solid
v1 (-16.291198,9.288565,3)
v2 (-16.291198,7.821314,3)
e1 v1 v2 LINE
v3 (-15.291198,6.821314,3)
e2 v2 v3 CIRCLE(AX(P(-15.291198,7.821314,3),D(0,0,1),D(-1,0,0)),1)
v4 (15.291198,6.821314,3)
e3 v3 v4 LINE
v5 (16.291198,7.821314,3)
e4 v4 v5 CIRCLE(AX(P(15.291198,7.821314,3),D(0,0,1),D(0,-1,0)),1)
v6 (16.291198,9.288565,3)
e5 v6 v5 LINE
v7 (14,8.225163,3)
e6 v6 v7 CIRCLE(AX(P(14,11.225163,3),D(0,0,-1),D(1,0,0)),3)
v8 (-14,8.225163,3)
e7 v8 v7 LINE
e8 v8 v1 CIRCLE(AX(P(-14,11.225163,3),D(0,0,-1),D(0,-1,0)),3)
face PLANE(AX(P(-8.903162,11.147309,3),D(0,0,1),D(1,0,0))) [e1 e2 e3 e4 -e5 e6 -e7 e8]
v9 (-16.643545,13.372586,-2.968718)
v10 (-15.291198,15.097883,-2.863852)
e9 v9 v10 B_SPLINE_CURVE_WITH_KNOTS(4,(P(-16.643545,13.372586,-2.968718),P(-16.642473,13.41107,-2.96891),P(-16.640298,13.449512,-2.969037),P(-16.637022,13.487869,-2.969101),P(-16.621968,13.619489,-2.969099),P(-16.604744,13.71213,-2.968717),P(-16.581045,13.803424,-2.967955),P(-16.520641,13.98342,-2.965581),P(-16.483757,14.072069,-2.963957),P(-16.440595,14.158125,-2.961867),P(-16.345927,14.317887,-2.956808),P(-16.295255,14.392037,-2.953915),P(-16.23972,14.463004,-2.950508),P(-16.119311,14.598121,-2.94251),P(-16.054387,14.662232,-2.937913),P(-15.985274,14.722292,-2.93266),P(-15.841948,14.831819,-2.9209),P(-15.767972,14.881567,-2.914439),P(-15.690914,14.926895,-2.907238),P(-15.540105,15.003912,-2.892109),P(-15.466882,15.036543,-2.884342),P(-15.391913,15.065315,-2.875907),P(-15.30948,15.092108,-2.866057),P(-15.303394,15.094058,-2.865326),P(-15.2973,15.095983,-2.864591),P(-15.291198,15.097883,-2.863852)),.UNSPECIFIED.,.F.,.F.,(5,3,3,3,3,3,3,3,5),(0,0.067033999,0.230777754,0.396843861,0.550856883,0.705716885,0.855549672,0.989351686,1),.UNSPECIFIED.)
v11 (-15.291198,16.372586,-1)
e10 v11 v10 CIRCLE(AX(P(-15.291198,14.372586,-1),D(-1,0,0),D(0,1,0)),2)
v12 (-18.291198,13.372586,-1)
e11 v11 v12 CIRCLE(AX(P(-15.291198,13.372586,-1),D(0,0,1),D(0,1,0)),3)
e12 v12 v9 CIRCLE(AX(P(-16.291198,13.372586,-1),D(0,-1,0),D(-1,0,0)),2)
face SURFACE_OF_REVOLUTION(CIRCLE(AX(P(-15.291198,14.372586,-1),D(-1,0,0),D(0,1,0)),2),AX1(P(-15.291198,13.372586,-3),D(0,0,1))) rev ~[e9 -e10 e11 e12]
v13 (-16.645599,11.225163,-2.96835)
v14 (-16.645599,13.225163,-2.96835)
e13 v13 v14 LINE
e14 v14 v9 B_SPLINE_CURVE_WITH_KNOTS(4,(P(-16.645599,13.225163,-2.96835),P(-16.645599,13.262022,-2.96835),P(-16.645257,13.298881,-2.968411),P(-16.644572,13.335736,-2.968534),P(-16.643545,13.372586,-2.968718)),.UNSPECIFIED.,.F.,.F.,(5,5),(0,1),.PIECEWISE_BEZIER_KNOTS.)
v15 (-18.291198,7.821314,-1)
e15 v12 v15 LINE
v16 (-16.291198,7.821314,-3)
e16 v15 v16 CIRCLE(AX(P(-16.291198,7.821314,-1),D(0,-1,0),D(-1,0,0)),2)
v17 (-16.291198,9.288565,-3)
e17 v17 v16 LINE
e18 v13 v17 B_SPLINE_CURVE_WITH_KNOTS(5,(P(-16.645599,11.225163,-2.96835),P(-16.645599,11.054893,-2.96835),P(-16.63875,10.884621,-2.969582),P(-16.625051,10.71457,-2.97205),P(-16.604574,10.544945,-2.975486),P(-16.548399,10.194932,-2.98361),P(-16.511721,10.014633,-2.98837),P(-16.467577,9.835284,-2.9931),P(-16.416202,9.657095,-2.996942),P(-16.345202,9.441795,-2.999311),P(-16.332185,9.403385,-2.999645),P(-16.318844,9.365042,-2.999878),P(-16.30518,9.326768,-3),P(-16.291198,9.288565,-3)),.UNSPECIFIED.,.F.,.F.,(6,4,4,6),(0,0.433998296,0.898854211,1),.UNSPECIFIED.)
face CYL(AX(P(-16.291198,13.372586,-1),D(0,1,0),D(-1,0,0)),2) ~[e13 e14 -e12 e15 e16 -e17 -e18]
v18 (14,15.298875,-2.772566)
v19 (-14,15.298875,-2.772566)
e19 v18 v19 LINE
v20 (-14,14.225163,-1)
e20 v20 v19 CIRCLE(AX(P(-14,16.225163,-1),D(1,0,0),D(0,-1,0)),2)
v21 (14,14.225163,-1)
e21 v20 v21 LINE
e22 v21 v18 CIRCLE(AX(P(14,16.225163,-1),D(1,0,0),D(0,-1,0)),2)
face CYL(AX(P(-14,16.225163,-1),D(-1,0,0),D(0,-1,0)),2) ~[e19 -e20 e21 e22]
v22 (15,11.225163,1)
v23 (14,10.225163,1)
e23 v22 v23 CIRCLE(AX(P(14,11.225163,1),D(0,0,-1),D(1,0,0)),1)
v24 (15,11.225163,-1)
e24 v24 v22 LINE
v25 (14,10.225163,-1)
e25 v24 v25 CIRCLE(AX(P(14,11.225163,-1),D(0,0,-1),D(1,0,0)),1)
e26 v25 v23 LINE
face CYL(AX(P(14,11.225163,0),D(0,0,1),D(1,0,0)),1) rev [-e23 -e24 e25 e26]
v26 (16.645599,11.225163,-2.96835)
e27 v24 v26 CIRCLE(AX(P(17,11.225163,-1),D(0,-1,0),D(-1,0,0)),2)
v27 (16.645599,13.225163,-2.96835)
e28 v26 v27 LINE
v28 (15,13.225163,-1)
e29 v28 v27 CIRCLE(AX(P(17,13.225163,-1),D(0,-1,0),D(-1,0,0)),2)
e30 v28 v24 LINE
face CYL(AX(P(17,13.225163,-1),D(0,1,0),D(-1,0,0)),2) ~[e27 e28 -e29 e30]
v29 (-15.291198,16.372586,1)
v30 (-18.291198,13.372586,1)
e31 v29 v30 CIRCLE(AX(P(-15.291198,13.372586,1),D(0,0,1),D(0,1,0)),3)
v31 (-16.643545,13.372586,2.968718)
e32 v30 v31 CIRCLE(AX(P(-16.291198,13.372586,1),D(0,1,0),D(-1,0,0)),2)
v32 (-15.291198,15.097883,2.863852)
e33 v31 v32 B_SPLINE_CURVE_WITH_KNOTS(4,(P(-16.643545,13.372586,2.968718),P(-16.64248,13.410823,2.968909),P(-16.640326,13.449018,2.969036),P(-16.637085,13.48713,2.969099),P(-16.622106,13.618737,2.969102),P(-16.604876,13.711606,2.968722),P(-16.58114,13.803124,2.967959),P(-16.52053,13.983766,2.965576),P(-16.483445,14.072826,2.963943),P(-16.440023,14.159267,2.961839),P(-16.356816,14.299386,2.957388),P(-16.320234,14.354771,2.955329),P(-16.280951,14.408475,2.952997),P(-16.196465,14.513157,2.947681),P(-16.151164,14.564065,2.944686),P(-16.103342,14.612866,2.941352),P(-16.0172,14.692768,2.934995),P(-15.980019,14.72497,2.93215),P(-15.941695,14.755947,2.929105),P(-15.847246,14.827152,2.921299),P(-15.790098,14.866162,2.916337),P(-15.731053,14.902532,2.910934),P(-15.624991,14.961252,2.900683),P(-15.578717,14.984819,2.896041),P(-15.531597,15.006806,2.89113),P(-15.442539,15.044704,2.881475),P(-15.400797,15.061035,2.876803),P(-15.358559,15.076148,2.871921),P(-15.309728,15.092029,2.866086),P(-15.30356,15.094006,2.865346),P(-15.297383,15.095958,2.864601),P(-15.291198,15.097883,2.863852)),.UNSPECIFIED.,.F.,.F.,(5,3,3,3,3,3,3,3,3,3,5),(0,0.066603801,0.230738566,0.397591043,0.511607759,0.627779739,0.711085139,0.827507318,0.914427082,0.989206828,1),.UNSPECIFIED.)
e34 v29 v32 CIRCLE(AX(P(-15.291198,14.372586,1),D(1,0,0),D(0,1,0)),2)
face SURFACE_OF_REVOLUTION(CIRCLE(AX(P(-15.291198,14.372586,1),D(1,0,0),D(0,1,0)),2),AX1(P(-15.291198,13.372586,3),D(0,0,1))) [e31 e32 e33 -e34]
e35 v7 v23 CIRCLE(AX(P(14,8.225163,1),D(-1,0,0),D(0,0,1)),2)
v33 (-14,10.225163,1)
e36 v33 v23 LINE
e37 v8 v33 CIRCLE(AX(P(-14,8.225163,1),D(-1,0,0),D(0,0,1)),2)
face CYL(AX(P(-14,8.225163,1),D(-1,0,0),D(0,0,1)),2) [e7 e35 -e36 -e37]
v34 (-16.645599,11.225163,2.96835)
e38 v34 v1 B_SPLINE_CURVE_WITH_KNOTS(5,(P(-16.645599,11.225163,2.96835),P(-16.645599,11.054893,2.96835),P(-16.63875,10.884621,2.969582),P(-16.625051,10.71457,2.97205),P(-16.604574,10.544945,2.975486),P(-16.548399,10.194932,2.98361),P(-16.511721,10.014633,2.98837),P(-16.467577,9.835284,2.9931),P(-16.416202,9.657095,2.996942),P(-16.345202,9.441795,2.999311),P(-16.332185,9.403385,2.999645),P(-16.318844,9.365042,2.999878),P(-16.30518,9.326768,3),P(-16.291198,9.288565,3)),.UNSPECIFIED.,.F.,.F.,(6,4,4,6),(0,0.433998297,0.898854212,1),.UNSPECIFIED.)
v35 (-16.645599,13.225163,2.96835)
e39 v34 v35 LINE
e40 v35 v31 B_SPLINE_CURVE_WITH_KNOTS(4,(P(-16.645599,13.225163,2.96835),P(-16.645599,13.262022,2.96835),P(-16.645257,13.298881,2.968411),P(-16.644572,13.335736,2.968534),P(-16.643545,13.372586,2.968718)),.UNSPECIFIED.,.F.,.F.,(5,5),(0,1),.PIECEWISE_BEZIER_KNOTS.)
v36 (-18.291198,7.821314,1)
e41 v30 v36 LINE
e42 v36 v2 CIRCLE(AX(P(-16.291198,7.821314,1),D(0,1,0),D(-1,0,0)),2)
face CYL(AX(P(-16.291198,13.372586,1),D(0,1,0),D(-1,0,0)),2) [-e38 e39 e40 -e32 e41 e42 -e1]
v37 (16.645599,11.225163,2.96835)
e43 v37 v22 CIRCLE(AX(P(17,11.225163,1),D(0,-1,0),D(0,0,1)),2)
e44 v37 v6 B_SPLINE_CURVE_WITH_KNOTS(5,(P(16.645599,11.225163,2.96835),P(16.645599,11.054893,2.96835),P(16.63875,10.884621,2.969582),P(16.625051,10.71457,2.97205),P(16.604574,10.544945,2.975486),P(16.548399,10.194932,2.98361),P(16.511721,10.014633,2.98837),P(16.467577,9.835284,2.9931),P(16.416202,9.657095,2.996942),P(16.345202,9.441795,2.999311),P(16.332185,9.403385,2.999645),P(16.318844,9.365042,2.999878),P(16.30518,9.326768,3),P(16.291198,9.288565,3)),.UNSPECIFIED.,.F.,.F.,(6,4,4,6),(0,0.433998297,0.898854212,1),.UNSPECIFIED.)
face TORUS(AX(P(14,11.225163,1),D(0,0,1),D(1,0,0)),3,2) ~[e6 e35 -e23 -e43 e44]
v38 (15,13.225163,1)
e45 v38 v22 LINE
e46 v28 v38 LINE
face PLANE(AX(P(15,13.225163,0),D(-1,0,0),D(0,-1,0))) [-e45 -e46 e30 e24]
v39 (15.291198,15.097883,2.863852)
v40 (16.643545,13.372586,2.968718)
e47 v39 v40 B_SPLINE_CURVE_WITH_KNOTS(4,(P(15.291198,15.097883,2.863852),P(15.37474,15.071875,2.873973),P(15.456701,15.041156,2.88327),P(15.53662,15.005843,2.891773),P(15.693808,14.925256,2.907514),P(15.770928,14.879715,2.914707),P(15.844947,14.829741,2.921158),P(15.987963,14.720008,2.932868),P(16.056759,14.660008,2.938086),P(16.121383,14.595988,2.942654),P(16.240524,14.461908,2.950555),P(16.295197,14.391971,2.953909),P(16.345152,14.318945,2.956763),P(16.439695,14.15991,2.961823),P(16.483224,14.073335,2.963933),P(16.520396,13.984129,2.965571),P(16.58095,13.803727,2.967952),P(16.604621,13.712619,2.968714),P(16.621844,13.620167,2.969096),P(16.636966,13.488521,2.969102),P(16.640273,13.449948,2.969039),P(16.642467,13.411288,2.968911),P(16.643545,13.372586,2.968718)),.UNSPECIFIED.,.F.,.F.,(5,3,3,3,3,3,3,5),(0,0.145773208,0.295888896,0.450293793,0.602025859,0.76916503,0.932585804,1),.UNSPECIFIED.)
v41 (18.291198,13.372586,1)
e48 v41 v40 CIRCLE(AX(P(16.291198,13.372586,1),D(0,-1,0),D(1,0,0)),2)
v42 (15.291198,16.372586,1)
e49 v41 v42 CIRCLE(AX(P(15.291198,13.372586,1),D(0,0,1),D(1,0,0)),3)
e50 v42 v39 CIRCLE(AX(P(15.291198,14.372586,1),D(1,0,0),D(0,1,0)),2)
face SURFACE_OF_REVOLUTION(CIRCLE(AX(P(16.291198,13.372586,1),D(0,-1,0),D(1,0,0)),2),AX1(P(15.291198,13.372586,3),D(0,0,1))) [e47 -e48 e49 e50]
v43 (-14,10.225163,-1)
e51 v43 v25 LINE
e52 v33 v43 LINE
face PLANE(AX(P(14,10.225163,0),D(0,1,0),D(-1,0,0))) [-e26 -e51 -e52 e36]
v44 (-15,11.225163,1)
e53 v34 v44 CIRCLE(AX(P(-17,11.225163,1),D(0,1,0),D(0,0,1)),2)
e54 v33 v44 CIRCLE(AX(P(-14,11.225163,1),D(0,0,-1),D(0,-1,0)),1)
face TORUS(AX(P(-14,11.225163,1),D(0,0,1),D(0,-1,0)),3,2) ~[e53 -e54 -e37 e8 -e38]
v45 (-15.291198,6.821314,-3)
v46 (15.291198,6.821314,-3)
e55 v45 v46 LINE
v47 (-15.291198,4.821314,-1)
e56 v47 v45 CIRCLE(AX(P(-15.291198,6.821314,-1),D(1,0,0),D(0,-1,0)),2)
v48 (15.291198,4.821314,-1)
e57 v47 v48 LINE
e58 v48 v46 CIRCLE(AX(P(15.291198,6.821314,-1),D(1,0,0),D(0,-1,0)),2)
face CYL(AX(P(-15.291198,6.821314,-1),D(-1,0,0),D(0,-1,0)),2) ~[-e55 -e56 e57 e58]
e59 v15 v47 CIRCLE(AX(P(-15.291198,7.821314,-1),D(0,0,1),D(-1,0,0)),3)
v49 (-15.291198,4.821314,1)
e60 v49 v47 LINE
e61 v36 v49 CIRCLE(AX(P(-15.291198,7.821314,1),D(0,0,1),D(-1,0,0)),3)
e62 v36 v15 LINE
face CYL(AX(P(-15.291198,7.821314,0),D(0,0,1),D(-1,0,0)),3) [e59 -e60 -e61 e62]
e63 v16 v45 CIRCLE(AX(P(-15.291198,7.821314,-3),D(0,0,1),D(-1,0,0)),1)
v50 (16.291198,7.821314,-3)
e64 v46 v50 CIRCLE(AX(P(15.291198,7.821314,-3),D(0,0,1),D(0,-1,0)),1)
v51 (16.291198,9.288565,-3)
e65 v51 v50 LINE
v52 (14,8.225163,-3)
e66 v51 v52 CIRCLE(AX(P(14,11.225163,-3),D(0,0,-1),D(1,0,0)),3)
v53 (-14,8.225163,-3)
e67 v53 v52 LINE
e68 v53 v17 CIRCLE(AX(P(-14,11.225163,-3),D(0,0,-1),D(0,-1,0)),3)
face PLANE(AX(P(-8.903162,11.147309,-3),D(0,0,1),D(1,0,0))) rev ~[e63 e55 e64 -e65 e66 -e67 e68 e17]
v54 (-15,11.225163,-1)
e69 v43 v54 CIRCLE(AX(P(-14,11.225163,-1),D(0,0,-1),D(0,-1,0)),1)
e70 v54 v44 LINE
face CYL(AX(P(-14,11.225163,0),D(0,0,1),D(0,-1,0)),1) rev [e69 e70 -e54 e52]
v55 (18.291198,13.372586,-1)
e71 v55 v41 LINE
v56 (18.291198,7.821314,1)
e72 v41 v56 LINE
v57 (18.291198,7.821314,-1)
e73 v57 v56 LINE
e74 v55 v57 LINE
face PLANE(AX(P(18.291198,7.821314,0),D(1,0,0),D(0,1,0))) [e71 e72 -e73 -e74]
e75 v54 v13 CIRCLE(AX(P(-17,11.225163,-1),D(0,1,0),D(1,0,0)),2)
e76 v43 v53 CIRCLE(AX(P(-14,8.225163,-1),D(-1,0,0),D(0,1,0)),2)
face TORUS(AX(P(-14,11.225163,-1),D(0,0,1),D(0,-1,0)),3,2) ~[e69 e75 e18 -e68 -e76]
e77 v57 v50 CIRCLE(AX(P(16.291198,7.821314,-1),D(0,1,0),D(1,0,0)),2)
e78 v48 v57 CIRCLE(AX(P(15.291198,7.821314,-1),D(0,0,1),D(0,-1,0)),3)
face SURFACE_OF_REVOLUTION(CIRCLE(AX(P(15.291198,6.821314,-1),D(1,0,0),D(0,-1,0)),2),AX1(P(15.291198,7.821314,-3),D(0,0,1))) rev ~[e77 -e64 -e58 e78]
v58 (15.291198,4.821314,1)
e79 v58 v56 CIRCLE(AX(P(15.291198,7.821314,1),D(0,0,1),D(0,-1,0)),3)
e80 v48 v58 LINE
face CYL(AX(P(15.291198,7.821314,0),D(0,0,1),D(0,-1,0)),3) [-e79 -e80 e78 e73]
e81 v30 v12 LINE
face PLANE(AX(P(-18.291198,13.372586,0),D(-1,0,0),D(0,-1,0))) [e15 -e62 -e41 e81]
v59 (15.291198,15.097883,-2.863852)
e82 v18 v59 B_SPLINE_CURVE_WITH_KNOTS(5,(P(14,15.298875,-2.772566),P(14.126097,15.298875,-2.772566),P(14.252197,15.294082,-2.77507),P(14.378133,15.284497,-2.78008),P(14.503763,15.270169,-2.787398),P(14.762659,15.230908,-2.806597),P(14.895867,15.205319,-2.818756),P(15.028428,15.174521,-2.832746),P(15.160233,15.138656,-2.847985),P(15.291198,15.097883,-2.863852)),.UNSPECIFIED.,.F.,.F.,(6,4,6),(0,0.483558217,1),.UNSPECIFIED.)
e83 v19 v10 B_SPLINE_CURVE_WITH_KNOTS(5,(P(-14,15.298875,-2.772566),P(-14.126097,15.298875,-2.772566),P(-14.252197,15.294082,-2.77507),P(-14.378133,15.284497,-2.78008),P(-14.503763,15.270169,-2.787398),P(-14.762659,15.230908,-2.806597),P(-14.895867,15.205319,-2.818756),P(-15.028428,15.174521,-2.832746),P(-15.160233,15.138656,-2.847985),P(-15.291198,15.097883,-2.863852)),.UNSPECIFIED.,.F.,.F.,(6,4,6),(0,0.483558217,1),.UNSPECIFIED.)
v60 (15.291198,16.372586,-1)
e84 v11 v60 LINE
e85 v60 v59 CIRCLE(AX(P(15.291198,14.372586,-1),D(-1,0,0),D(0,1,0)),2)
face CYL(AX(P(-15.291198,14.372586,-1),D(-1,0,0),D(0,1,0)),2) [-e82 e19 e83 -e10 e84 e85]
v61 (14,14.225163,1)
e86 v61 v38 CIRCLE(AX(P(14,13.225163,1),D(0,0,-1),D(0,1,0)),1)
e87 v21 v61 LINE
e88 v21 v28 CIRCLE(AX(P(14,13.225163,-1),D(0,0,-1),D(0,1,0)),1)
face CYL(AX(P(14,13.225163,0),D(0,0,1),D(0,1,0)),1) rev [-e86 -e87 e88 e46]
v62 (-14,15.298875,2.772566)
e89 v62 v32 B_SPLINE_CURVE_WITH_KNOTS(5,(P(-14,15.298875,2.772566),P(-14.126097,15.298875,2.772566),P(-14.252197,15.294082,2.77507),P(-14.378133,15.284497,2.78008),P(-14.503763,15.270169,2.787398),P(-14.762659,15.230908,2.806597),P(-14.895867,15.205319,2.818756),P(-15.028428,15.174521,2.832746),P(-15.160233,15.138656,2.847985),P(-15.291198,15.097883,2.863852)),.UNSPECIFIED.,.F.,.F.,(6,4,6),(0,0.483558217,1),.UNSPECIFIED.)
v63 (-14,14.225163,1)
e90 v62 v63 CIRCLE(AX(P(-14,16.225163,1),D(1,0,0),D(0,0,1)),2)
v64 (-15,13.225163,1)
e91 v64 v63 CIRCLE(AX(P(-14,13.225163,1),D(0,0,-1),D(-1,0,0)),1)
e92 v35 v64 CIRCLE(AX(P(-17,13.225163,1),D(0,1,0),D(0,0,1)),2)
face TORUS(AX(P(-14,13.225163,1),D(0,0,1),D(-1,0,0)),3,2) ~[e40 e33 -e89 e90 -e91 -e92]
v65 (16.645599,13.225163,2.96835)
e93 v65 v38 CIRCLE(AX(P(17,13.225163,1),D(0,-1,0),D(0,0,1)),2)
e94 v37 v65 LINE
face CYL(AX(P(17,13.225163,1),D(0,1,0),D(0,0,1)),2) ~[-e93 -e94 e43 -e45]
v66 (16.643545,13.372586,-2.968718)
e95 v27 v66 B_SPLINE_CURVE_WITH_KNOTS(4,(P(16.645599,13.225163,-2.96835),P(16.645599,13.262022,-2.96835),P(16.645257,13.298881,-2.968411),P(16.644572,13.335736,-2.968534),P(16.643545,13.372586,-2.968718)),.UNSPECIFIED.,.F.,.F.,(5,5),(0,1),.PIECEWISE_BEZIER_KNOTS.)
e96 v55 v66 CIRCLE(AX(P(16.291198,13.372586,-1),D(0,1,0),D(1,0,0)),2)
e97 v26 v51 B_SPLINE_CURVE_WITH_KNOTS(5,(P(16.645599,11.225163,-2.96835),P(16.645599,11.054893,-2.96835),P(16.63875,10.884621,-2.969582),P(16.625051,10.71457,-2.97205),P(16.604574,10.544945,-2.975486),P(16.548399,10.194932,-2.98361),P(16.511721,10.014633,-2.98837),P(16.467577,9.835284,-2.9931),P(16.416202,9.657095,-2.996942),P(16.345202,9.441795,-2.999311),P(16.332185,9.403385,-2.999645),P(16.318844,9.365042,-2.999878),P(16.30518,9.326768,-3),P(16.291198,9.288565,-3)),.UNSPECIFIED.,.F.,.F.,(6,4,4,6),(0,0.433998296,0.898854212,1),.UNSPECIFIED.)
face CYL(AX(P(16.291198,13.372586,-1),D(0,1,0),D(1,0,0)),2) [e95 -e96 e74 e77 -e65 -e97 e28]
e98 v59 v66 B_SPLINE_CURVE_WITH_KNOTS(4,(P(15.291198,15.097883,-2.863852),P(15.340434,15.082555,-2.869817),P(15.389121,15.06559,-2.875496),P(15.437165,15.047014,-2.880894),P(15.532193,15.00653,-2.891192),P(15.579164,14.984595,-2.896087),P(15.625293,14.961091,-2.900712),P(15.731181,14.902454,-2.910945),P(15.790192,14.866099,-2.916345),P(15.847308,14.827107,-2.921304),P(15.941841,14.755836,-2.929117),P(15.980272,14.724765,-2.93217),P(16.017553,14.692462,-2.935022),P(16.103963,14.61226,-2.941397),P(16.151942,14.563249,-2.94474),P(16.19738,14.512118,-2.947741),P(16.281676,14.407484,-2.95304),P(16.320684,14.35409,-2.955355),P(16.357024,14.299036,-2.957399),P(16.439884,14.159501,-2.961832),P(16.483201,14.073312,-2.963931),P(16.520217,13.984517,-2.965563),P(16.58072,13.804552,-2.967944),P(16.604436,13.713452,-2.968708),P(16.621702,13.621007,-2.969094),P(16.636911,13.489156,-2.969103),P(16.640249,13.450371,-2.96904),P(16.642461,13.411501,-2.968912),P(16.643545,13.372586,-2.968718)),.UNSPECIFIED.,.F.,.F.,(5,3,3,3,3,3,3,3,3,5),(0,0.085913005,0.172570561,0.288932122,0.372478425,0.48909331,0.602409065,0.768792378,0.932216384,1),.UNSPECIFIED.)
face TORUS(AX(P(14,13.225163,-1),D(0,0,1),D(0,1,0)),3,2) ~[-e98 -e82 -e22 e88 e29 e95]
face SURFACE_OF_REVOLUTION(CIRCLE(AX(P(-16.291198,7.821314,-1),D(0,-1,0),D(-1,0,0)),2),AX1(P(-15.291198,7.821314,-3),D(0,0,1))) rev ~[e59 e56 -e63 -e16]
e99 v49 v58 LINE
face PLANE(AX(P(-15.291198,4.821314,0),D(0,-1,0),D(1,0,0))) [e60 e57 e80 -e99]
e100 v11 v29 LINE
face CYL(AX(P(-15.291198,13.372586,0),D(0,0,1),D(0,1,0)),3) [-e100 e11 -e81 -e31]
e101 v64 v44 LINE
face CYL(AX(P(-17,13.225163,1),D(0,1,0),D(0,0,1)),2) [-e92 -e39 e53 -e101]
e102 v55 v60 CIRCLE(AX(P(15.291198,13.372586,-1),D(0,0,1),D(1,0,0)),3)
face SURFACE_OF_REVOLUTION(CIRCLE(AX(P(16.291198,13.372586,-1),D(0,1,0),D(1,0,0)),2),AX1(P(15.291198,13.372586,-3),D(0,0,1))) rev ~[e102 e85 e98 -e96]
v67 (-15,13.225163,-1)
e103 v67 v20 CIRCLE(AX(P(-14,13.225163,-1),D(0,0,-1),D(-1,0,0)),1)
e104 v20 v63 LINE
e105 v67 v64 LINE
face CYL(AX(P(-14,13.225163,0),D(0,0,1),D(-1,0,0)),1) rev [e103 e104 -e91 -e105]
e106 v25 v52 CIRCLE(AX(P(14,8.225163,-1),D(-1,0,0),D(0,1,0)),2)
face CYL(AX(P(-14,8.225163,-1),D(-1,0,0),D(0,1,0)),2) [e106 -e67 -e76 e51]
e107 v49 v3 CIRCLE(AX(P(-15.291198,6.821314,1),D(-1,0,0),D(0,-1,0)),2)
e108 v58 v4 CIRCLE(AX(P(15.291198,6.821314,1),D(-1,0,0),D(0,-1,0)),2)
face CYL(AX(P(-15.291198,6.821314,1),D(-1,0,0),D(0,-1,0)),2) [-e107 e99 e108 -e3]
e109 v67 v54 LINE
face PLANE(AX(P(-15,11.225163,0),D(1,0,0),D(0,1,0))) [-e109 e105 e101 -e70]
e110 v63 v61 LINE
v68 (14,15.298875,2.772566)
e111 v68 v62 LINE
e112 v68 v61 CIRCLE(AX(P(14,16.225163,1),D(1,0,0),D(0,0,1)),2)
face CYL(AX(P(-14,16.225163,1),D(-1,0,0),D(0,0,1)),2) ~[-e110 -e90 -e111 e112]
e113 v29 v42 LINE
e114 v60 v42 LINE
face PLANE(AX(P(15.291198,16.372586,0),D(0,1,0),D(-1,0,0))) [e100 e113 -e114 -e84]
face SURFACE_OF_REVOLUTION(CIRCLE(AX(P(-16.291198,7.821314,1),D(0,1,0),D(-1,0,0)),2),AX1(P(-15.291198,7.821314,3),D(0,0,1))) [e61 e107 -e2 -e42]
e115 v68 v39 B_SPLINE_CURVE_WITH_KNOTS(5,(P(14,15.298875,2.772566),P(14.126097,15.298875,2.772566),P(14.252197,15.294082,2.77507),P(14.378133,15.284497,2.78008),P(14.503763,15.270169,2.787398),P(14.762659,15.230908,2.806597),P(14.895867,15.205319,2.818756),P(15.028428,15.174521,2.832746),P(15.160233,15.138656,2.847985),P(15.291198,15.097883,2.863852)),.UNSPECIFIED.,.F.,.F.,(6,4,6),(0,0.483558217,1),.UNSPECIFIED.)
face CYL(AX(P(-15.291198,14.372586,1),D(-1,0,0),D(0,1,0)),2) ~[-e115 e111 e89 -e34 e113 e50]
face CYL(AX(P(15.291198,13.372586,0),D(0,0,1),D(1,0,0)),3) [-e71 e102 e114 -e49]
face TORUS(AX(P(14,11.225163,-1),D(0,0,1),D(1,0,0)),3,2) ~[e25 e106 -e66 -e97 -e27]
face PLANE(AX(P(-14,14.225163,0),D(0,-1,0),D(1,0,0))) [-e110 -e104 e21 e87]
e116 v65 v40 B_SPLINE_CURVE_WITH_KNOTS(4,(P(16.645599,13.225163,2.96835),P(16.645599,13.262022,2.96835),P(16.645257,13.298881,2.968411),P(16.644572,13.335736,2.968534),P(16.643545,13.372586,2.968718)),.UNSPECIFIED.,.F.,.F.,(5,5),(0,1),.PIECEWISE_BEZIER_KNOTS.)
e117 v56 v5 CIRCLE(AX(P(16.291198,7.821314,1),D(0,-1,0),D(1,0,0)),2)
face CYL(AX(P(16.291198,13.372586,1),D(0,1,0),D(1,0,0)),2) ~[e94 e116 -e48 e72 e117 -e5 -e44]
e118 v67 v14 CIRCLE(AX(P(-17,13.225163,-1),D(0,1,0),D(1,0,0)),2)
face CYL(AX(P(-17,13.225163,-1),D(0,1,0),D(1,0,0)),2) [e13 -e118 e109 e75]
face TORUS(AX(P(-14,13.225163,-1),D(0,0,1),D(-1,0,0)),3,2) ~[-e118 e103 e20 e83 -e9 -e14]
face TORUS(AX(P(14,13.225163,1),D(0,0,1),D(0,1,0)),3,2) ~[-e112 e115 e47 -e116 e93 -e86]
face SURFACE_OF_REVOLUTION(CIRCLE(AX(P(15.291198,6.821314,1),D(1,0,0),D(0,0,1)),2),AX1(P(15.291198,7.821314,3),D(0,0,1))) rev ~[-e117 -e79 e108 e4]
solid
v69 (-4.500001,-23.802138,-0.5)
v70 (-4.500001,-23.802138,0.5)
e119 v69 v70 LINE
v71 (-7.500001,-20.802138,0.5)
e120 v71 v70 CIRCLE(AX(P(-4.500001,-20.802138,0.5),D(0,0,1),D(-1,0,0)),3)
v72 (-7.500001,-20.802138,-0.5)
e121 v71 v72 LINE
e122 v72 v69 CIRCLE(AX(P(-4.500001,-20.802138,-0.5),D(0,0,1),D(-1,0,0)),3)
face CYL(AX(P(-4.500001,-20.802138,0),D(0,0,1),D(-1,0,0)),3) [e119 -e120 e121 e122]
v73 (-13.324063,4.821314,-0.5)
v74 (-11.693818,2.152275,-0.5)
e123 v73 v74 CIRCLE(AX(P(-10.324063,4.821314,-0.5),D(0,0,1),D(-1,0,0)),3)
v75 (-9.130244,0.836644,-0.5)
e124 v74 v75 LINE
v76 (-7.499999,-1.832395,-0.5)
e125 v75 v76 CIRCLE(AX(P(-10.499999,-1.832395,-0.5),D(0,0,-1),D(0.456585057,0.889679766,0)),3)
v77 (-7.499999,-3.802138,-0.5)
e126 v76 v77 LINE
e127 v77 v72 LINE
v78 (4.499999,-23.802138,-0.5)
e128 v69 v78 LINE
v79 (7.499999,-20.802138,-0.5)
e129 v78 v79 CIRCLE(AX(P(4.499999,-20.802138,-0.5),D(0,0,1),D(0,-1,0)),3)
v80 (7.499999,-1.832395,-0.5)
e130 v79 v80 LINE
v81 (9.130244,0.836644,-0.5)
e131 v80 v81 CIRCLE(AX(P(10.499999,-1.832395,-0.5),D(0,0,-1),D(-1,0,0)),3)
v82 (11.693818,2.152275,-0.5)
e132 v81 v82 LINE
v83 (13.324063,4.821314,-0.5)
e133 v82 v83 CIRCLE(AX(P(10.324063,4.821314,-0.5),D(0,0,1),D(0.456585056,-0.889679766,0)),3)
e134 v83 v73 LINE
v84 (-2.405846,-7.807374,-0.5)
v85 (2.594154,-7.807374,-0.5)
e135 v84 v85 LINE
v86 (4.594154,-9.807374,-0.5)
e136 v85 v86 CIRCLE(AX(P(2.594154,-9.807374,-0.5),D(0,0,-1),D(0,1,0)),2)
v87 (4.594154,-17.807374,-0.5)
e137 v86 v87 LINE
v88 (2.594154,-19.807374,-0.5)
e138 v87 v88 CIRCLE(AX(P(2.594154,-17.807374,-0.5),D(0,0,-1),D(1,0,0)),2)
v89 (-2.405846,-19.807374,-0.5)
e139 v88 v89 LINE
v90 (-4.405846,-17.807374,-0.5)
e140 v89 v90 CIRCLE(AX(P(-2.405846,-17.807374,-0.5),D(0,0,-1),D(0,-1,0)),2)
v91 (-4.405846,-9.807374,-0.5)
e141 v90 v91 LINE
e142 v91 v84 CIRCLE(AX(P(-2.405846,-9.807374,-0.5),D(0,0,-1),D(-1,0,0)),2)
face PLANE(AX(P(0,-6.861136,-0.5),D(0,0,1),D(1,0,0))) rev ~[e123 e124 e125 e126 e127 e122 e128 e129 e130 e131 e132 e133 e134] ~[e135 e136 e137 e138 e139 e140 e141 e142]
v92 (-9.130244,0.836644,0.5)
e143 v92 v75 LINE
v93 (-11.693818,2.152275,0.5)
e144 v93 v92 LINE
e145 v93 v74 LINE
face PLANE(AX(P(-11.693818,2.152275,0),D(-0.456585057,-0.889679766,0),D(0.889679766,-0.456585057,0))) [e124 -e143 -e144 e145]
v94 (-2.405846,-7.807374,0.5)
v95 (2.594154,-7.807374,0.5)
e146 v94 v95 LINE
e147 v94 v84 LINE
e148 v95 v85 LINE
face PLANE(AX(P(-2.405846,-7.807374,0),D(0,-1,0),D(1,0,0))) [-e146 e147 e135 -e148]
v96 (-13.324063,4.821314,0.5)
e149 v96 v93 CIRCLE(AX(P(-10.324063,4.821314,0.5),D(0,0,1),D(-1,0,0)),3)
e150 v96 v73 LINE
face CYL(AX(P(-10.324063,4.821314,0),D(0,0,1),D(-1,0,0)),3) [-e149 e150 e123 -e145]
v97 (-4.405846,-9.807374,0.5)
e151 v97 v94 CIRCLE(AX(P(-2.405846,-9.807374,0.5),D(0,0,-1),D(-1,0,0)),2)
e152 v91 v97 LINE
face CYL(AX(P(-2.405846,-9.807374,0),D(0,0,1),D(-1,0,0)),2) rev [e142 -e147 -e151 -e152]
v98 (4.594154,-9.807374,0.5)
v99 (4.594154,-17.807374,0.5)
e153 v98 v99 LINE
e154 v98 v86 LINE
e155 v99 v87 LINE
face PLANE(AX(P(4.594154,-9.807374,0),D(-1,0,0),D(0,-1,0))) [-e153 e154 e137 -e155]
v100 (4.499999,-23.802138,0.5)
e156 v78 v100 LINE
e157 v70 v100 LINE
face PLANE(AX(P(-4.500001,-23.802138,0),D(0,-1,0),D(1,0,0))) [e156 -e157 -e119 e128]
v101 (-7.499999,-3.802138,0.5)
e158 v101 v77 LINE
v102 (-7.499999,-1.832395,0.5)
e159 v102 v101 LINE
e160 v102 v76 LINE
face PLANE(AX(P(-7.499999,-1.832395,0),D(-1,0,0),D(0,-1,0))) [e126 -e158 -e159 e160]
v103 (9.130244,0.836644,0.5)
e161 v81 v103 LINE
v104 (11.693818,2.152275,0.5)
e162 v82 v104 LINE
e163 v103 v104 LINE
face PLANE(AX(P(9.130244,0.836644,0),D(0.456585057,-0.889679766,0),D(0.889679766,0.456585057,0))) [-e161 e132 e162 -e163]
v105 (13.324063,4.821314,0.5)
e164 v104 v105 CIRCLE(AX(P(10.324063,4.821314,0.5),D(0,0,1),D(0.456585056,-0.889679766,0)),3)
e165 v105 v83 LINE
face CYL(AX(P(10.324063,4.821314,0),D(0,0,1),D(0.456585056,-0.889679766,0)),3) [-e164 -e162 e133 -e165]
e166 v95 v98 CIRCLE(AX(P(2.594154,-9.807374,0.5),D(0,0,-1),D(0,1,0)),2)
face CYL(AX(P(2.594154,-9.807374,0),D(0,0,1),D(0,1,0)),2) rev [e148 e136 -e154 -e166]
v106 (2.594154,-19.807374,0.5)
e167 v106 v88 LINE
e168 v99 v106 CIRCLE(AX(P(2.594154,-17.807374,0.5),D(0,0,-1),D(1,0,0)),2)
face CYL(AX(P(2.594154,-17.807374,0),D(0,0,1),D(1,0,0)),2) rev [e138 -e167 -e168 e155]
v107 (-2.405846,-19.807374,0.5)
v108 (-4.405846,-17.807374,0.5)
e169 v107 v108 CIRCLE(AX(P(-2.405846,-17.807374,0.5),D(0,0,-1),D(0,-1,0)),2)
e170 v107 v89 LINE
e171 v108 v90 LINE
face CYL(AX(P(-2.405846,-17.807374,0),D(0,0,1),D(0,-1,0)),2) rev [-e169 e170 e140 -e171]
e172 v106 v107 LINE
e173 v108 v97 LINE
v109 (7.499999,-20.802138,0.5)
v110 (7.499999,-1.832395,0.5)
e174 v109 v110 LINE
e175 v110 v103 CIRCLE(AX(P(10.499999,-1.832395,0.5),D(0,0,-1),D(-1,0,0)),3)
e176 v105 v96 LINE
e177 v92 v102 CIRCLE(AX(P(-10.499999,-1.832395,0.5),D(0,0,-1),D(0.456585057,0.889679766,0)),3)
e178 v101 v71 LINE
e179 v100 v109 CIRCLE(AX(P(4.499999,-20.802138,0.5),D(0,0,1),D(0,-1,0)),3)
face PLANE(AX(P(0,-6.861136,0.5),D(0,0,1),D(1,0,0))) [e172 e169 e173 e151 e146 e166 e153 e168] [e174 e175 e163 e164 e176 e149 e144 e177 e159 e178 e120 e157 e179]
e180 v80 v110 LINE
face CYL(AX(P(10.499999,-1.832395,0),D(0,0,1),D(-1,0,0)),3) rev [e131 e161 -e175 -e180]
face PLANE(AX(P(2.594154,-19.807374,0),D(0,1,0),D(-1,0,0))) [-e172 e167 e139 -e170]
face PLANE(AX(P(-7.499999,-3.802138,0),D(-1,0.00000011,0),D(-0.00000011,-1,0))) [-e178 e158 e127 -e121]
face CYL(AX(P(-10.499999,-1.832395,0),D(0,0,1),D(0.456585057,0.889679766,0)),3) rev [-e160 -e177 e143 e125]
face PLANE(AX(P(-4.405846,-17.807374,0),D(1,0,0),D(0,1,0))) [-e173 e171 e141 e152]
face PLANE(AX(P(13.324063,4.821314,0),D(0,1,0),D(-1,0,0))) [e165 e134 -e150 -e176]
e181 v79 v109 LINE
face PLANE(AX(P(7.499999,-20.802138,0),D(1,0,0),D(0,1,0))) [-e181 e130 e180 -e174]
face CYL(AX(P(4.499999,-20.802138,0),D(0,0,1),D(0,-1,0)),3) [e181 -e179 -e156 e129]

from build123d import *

# Parameters (mm, degrees)
F1_DEPTH     = 0.5
F2_DEPTH     = 3
F3_T1_DEPTH  = 30.5823954344
F3_T3_DEPTH  = 28
F3_T5_DEPTH  = 2
F3_T7_DEPTH  = 5.5512716671
F3_T10_ANGLE = 90
F3_T12_ANGLE = 90
F3_T14_ANGLE = 90
F3_T16_ANGLE = 90
F3_T18_ANGLE = 90
F3_T20_ANGLE = 90
F3_T22_ANGLE = 90
F3_T24_ANGLE = 90
F3_T26_ANGLE = 90
F3_T28_ANGLE = 90
F3_T30_ANGLE = 90
F3_T32_ANGLE = 90
F3_T34_ANGLE = 90
F3_T36_ANGLE = 90
F3_T38_ANGLE = 90
F3_T40_ANGLE = 90


# Not quite as in the source:
# - a fillet or chamfer that OpenCascade refuses, or shapes differently, is made with other operations: its cross-section is extruded or revolved along the edge and cut away or added
# - ends of sketch curves that miss each other by under 0.0002 mm in the source are joined


with BuildPart() as f1:
    # F0 (on Top) → F1 (new body, symmetric)
    with BuildSketch(Plane.XY):
        with BuildLine():
            ThreePointArc((-7.5000009313, -20.8021384721), (-6.6213212749, -22.9234588157), (-4.5000009313, -23.8021384721))
            Line((-4.5000009313, -23.8021384721), (4.4999990687, -23.8021384721))
            ThreePointArc((4.4999990687, -23.8021384721), (6.6213194122, -22.9234588157), (7.4999990687, -20.8021384721))
            Line((7.4999990687, -20.8021384721), (7.4999990687, -3.8021384721))
            Line((7.4999990687, -3.8021384721), (7.4999990687, -1.8323950848))
            ThreePointArc((7.4999990687, -1.8323950848), (7.9397973668, -0.2686280799), (9.1302438991, 0.8366442134))
            Line((9.1302438991, 0.8366442134), (11.6938184408, 2.1522747039))
            ThreePointArc((11.6938184408, 2.1522747039), (12.8842649732, 3.2575469972), (13.3240632713, 4.8213140021))
            Line((13.3240632713, 4.8213140021), (0, 4.8213140021))
            Line((0, 4.8213140021), (-13.3240632713, 4.8213140021))
            ThreePointArc((-13.3240632713, 4.8213140021), (-12.8842649732, 3.2575469972), (-11.6938184408, 2.1522747039))
            Line((-11.6938184408, 2.1522747039), (-9.1302438991, 0.8366442134))
            ThreePointArc((-9.1302438991, 0.8366442134), (-7.9397973668, -0.2686280799), (-7.4999990687, -1.8323950848))
            Line((-7.4999990687, -1.8323950848), (-7.4999990687, -3.8021384721))
            Line((-7.4999990687, -3.8021384721), (-7.5000009313, -20.8021384721))
        make_face()
        with BuildLine():
            ThreePointArc((-4.4058463536, -9.8073738366), (-3.820059916, -8.3931602743), (-2.4058463536, -7.8073738366))
            Line((-2.4058463536, -7.8073738366), (2.5941536464, -7.8073738366))
            ThreePointArc((2.5941536464, -7.8073738366), (4.0083672088, -8.3931602743), (4.5941536464, -9.8073738366))
            Line((4.5941536464, -9.8073738366), (4.5941536464, -17.8073738366))
            ThreePointArc((4.5941536464, -17.8073738366), (4.0083672088, -19.221587399), (2.5941536464, -19.8073738366))
            Line((2.5941536464, -19.8073738366), (-2.4058463536, -19.8073738366))
            ThreePointArc((-2.4058463536, -19.8073738366), (-3.820059916, -19.221587399), (-4.4058463536, -17.8073738366))
            Line((-4.4058463536, -17.8073738366), (-4.4058463536, -9.8073738366))
        make_face(mode=Mode.SUBTRACT)
    extrude(amount=F1_DEPTH, both=True)


with BuildPart() as f2:
    # F0 (on Top) → F2 (new body, symmetric)
    with BuildSketch(Plane.XY):
        with BuildLine():
            Line((-15.2911977172, 4.8213140021), (-13.3240632713, 4.8213140021))
            Line((-13.3240632713, 4.8213140021), (0, 4.8213140021))
            Line((0, 4.8213140021), (0, 10.225163497))
            Line((0, 10.225163497), (-14, 10.225163497))
            ThreePointArc((-14, 10.225163497), (-14.7071067812, 10.5180567158), (-15, 11.225163497))
            Line((-15, 11.225163497), (-15, 13.225163497))
            ThreePointArc((-15, 13.225163497), (-14.7071067812, 13.9322702782), (-14, 14.225163497))
            Line((-14, 14.225163497), (0, 14.225163497))
            Line((0, 14.225163497), (0, 16.3725856692))
            Line((0, 16.3725856692), (-15.2911977172, 16.3725856692))
            ThreePointArc((-15.2911977172, 16.3725856692), (-17.4125180607, 15.4939060127), (-18.2911977172, 13.3725856692))
            Line((-18.2911977172, 13.3725856692), (-18.2911977172, 7.8213140021))
            ThreePointArc((-18.2911977172, 7.8213140021), (-17.4125180607, 5.6999936585), (-15.2911977172, 4.8213140021))
        make_face()
        with BuildLine():
            Line((0, 4.8213140021), (13.3240632713, 4.8213140021))
            Line((13.3240632713, 4.8213140021), (15.2911977172, 4.8213140021))
            ThreePointArc((15.2911977172, 4.8213140021), (17.4125180607, 5.6999936585), (18.2911977172, 7.8213140021))
            Line((18.2911977172, 7.8213140021), (18.2911977172, 13.3725856692))
            ThreePointArc((18.2911977172, 13.3725856692), (17.4125180607, 15.4939060127), (15.2911977172, 16.3725856692))
            Line((15.2911977172, 16.3725856692), (0, 16.3725856692))
            Line((0, 16.3725856692), (0, 14.225163497))
            Line((0, 14.225163497), (14, 14.225163497))
            ThreePointArc((14, 14.225163497), (14.7071067812, 13.9322702782), (15, 13.225163497))
            Line((15, 13.225163497), (15, 11.225163497))
            ThreePointArc((15, 11.225163497), (14.7071067812, 10.5180567158), (14, 10.225163497))
            Line((14, 10.225163497), (0, 10.225163497))
            Line((0, 10.225163497), (0, 4.8213140021))
        make_face()
    extrude(amount=F2_DEPTH, both=True)

    # F3: fillet of radius 2 on 4 edges, made by hand

    # F3_s2 → F3_t1 (cut)
    with BuildSketch(Plane.YZ.offset(-15.2911977172)):
        with BuildLine():
            ThreePointArc((4.8213140021, 1), (5.4071004397, 2.4142135624), (6.8213140021, 3))
            Line((6.8213140021, 3), (4.8213140021, 3))
            Line((4.8213140021, 3), (4.8213140021, 1))
        make_face()
        with BuildLine():
            ThreePointArc((4.8213140021, -1), (5.4071004397, -2.4142135624), (6.8213140021, -3))
            Line((6.8213140021, -3), (4.8213140021, -3))
            Line((4.8213140021, -3), (4.8213140021, -1))
        make_face()
        with BuildLine():
            ThreePointArc((16.3725856692, -1), (15.7867992315, -2.4142135624), (14.3725856692, -3))
            Line((14.3725856692, -3), (16.3725856692, -3))
            Line((16.3725856692, -3), (16.3725856692, -1))
        make_face()
        with BuildLine():
            ThreePointArc((16.3725856692, 1), (15.7867992315, 2.4142135624), (14.3725856692, 3))
            Line((14.3725856692, 3), (16.3725856692, 3))
            Line((16.3725856692, 3), (16.3725856692, 1))
        make_face()
    extrude(amount=F3_T1_DEPTH, mode=Mode.SUBTRACT)

    # F3_s4 → F3_t3 (cut)
    with BuildSketch(Plane.YZ.offset(-14)):
        with BuildLine():
            ThreePointArc((16.225163497, 3), (14.8109499347, 2.4142135624), (14.225163497, 1))
            Line((14.225163497, 1), (14.225163497, 3))
            Line((14.225163497, 3), (16.225163497, 3))
        make_face()
        with BuildLine():
            ThreePointArc((14.225163497, -1), (14.8109499347, -2.4142135624), (16.225163497, -3))
            Line((16.225163497, -3), (14.225163497, -3))
            Line((14.225163497, -3), (14.225163497, -1))
        make_face()
        with BuildLine():
            ThreePointArc((10.225163497, -1), (9.6393770594, -2.4142135624), (8.225163497, -3))
            Line((8.225163497, -3), (10.225163497, -3))
            Line((10.225163497, -3), (10.225163497, -1))
        make_face()
        with BuildLine():
            ThreePointArc((8.225163497, 3), (9.6393770594, 2.4142135624), (10.225163497, 1))
            Line((10.225163497, 1), (10.225163497, 3))
            Line((10.225163497, 3), (8.225163497, 3))
        make_face()
    extrude(amount=F3_T3_DEPTH, mode=Mode.SUBTRACT)

    # F3_s6 → F3_t5 (cut)
    with BuildSketch(Plane.XZ.offset(-13.225163497)):
        with BuildLine():
            ThreePointArc((15, -1), (15.5857864376, -2.4142135624), (17, -3))
            Line((17, -3), (15, -3))
            Line((15, -3), (15, -1))
        make_face()
        with BuildLine():
            ThreePointArc((-15, -1), (-15.5857864376, -2.4142135624), (-17, -3))
            Line((-17, -3), (-15, -3))
            Line((-15, -3), (-15, -1))
        make_face()
        with BuildLine():
            ThreePointArc((17, 3), (15.5857864376, 2.4142135624), (15, 1))
            Line((15, 1), (15, 3))
            Line((15, 3), (17, 3))
        make_face()
        with BuildLine():
            ThreePointArc((-17, 3), (-15.5857864376, 2.4142135624), (-15, 1))
            Line((-15, 1), (-15, 3))
            Line((-15, 3), (-17, 3))
        make_face()
    extrude(amount=F3_T5_DEPTH, mode=Mode.SUBTRACT)

    # F3_s8 → F3_t7 (cut)
    with BuildSketch(Plane.XZ.offset(-13.3725856692)):
        with BuildLine():
            ThreePointArc((18.2911977172, -1), (17.7054112796, -2.4142135624), (16.2911977172, -3))
            Line((16.2911977172, -3), (18.2911977172, -3))
            Line((18.2911977172, -3), (18.2911977172, -1))
        make_face()
        with BuildLine():
            ThreePointArc((-18.2911977172, -1), (-17.7054112796, -2.4142135624), (-16.2911977172, -3))
            Line((-16.2911977172, -3), (-18.2911977172, -3))
            Line((-18.2911977172, -3), (-18.2911977172, -1))
        make_face()
        with BuildLine():
            ThreePointArc((18.2911977172, 1), (17.7054112796, 2.4142135624), (16.2911977172, 3))
            Line((16.2911977172, 3), (18.2911977172, 3))
            Line((18.2911977172, 3), (18.2911977172, 1))
        make_face()
        with BuildLine():
            ThreePointArc((-18.2911977172, 1), (-17.7054112796, 2.4142135624), (-16.2911977172, 3))
            Line((-16.2911977172, 3), (-18.2911977172, 3))
            Line((-18.2911977172, 3), (-18.2911977172, 1))
        make_face()
    extrude(amount=F3_T7_DEPTH, mode=Mode.SUBTRACT)

    # F3_s9 → F3_t10 (revolve, cut)
    with BuildSketch(Plane.XZ.offset(-13.225163497)):
        with BuildLine():
            ThreePointArc((-15, -1), (-15.5857864376, -2.4142135624), (-17, -3))
            Line((-17, -3), (-15, -3))
            Line((-15, -3), (-15, -1))
        make_face()
    revolve(axis=Axis((-14, 13.225163497, -3), (0, 0, -1)), revolution_arc=F3_T10_ANGLE, mode=Mode.SUBTRACT)

    # F3_s11 → F3_t12 (revolve, cut)
    with BuildSketch(Plane.YZ.offset(14)):
        with BuildLine():
            ThreePointArc((14.225163497, -1), (14.8109499347, -2.4142135624), (16.225163497, -3))
            Line((16.225163497, -3), (14.225163497, -3))
            Line((14.225163497, -3), (14.225163497, -1))
        make_face()
    revolve(axis=Axis((14, 13.225163497, -3), (0, 0, -1)), revolution_arc=F3_T12_ANGLE, mode=Mode.SUBTRACT)

    # F3_s13 → F3_t14 (revolve, cut)
    with BuildSketch(Plane.XZ.offset(-11.225163497)):
        with BuildLine():
            ThreePointArc((15, -1), (15.5857864376, -2.4142135624), (17, -3))
            Line((17, -3), (15, -3))
            Line((15, -3), (15, -1))
        make_face()
    revolve(axis=Axis((14, 11.225163497, -3), (0, 0, -1)), revolution_arc=F3_T14_ANGLE, mode=Mode.SUBTRACT)

    # F3_s15 → F3_t16 (revolve, cut)
    with BuildSketch(Plane.YZ.offset(-14)):
        with BuildLine():
            ThreePointArc((10.225163497, -1), (9.6393770594, -2.4142135624), (8.225163497, -3))
            Line((8.225163497, -3), (10.225163497, -3))
            Line((10.225163497, -3), (10.225163497, -1))
        make_face()
    revolve(axis=Axis((-14, 11.225163497, -3), (0, 0, -1)), revolution_arc=F3_T16_ANGLE, mode=Mode.SUBTRACT)

    # F3_s17 → F3_t18 (revolve, cut)
    with BuildSketch(Plane.XZ.offset(-13.225163497)):
        with BuildLine():
            ThreePointArc((-17, 3), (-15.5857864376, 2.4142135624), (-15, 1))
            Line((-15, 1), (-15, 3))
            Line((-15, 3), (-17, 3))
        make_face()
    revolve(axis=Axis((-14, 13.225163497, 3), (0, 0, -1)), revolution_arc=F3_T18_ANGLE, mode=Mode.SUBTRACT)

    # F3_s19 → F3_t20 (revolve, cut)
    with BuildSketch(Plane.YZ.offset(14)):
        with BuildLine():
            ThreePointArc((16.225163497, 3), (14.8109499347, 2.4142135624), (14.225163497, 1))
            Line((14.225163497, 1), (14.225163497, 3))
            Line((14.225163497, 3), (16.225163497, 3))
        make_face()
    revolve(axis=Axis((14, 13.225163497, 3), (0, 0, -1)), revolution_arc=F3_T20_ANGLE, mode=Mode.SUBTRACT)

    # F3_s21 → F3_t22 (revolve, cut)
    with BuildSketch(Plane.XZ.offset(-11.225163497)):
        with BuildLine():
            ThreePointArc((17, 3), (15.5857864376, 2.4142135624), (15, 1))
            Line((15, 1), (15, 3))
            Line((15, 3), (17, 3))
        make_face()
    revolve(axis=Axis((14, 11.225163497, 3), (0, 0, -1)), revolution_arc=F3_T22_ANGLE, mode=Mode.SUBTRACT)

    # F3_s23 → F3_t24 (revolve, cut)
    with BuildSketch(Plane.YZ.offset(-14)):
        with BuildLine():
            ThreePointArc((8.225163497, 3), (9.6393770594, 2.4142135624), (10.225163497, 1))
            Line((10.225163497, 1), (10.225163497, 3))
            Line((10.225163497, 3), (8.225163497, 3))
        make_face()
    revolve(axis=Axis((-14, 11.225163497, 3), (0, 0, -1)), revolution_arc=F3_T24_ANGLE, mode=Mode.SUBTRACT)

    # F3_s25 → F3_t26 (revolve, cut)
    with BuildSketch(Plane.XZ.offset(-7.8213140021)):
        with BuildLine():
            ThreePointArc((-18.2911977172, -1), (-17.7054112796, -2.4142135624), (-16.2911977172, -3))
            Line((-16.2911977172, -3), (-18.2911977172, -3))
            Line((-18.2911977172, -3), (-18.2911977172, -1))
        make_face()
    revolve(axis=Axis((-15.2911977172, 7.8213140021, -3), (0, 0, 1)), revolution_arc=F3_T26_ANGLE, mode=Mode.SUBTRACT)

    # F3_s27 → F3_t28 (revolve, cut)
    with BuildSketch(Plane.YZ.offset(15.2911977172)):
        with BuildLine():
            ThreePointArc((4.8213140021, -1), (5.4071004397, -2.4142135624), (6.8213140021, -3))
            Line((6.8213140021, -3), (4.8213140021, -3))
            Line((4.8213140021, -3), (4.8213140021, -1))
        make_face()
    revolve(axis=Axis((15.2911977172, 7.8213140021, -3), (0, 0, 1)), revolution_arc=F3_T28_ANGLE, mode=Mode.SUBTRACT)

    # F3_s29 → F3_t30 (revolve, cut)
    with BuildSketch(Plane.XZ.offset(-13.3725856692)):
        with BuildLine():
            ThreePointArc((18.2911977172, -1), (17.7054112796, -2.4142135624), (16.2911977172, -3))
            Line((16.2911977172, -3), (18.2911977172, -3))
            Line((18.2911977172, -3), (18.2911977172, -1))
        make_face()
    revolve(axis=Axis((15.2911977172, 13.3725856692, -3), (0, 0, 1)), revolution_arc=F3_T30_ANGLE, mode=Mode.SUBTRACT)

    # F3_s31 → F3_t32 (revolve, cut)
    with BuildSketch(Plane.YZ.offset(-15.2911977172)):
        with BuildLine():
            ThreePointArc((16.3725856692, -1), (15.7867992315, -2.4142135624), (14.3725856692, -3))
            Line((14.3725856692, -3), (16.3725856692, -3))
            Line((16.3725856692, -3), (16.3725856692, -1))
        make_face()
    revolve(axis=Axis((-15.2911977172, 13.3725856692, -3), (0, 0, 1)), revolution_arc=F3_T32_ANGLE, mode=Mode.SUBTRACT)

    # F3_s33 → F3_t34 (revolve, cut)
    with BuildSketch(Plane.XZ.offset(-7.8213140021)):
        with BuildLine():
            ThreePointArc((-18.2911977172, 1), (-17.7054112796, 2.4142135624), (-16.2911977172, 3))
            Line((-16.2911977172, 3), (-18.2911977172, 3))
            Line((-18.2911977172, 3), (-18.2911977172, 1))
        make_face()
    revolve(axis=Axis((-15.2911977172, 7.8213140021, 3), (0, 0, 1)), revolution_arc=F3_T34_ANGLE, mode=Mode.SUBTRACT)

    # F3_s35 → F3_t36 (revolve, cut)
    with BuildSketch(Plane.YZ.offset(15.2911977172)):
        with BuildLine():
            ThreePointArc((6.8213140021, 3), (5.4071004397, 2.4142135624), (4.8213140021, 1))
            Line((4.8213140021, 1), (4.8213140021, 3))
            Line((4.8213140021, 3), (6.8213140021, 3))
        make_face()
    revolve(axis=Axis((15.2911977172, 7.8213140021, 3), (0, 0, 1)), revolution_arc=F3_T36_ANGLE, mode=Mode.SUBTRACT)

    # F3_s37 → F3_t38 (revolve, cut)
    with BuildSketch(Plane.XZ.offset(-13.3725856692)):
        with BuildLine():
            ThreePointArc((18.2911977172, 1), (17.7054112796, 2.4142135624), (16.2911977172, 3))
            Line((16.2911977172, 3), (18.2911977172, 3))
            Line((18.2911977172, 3), (18.2911977172, 1))
        make_face()
    revolve(axis=Axis((15.2911977172, 13.3725856692, 3), (0, 0, 1)), revolution_arc=F3_T38_ANGLE, mode=Mode.SUBTRACT)

    # F3_s39 → F3_t40 (revolve, cut)
    with BuildSketch(Plane.YZ.offset(-15.2911977172)):
        with BuildLine():
            ThreePointArc((16.3725856692, 1), (15.7867992315, 2.4142135624), (14.3725856692, 3))
            Line((14.3725856692, 3), (16.3725856692, 3))
            Line((16.3725856692, 3), (16.3725856692, 1))
        make_face()
    revolve(axis=Axis((-15.2911977172, 13.3725856692, 3), (0, 0, 1)), revolution_arc=F3_T40_ANGLE, mode=Mode.SUBTRACT)


solid = Compound([f1.part, f2.part])
